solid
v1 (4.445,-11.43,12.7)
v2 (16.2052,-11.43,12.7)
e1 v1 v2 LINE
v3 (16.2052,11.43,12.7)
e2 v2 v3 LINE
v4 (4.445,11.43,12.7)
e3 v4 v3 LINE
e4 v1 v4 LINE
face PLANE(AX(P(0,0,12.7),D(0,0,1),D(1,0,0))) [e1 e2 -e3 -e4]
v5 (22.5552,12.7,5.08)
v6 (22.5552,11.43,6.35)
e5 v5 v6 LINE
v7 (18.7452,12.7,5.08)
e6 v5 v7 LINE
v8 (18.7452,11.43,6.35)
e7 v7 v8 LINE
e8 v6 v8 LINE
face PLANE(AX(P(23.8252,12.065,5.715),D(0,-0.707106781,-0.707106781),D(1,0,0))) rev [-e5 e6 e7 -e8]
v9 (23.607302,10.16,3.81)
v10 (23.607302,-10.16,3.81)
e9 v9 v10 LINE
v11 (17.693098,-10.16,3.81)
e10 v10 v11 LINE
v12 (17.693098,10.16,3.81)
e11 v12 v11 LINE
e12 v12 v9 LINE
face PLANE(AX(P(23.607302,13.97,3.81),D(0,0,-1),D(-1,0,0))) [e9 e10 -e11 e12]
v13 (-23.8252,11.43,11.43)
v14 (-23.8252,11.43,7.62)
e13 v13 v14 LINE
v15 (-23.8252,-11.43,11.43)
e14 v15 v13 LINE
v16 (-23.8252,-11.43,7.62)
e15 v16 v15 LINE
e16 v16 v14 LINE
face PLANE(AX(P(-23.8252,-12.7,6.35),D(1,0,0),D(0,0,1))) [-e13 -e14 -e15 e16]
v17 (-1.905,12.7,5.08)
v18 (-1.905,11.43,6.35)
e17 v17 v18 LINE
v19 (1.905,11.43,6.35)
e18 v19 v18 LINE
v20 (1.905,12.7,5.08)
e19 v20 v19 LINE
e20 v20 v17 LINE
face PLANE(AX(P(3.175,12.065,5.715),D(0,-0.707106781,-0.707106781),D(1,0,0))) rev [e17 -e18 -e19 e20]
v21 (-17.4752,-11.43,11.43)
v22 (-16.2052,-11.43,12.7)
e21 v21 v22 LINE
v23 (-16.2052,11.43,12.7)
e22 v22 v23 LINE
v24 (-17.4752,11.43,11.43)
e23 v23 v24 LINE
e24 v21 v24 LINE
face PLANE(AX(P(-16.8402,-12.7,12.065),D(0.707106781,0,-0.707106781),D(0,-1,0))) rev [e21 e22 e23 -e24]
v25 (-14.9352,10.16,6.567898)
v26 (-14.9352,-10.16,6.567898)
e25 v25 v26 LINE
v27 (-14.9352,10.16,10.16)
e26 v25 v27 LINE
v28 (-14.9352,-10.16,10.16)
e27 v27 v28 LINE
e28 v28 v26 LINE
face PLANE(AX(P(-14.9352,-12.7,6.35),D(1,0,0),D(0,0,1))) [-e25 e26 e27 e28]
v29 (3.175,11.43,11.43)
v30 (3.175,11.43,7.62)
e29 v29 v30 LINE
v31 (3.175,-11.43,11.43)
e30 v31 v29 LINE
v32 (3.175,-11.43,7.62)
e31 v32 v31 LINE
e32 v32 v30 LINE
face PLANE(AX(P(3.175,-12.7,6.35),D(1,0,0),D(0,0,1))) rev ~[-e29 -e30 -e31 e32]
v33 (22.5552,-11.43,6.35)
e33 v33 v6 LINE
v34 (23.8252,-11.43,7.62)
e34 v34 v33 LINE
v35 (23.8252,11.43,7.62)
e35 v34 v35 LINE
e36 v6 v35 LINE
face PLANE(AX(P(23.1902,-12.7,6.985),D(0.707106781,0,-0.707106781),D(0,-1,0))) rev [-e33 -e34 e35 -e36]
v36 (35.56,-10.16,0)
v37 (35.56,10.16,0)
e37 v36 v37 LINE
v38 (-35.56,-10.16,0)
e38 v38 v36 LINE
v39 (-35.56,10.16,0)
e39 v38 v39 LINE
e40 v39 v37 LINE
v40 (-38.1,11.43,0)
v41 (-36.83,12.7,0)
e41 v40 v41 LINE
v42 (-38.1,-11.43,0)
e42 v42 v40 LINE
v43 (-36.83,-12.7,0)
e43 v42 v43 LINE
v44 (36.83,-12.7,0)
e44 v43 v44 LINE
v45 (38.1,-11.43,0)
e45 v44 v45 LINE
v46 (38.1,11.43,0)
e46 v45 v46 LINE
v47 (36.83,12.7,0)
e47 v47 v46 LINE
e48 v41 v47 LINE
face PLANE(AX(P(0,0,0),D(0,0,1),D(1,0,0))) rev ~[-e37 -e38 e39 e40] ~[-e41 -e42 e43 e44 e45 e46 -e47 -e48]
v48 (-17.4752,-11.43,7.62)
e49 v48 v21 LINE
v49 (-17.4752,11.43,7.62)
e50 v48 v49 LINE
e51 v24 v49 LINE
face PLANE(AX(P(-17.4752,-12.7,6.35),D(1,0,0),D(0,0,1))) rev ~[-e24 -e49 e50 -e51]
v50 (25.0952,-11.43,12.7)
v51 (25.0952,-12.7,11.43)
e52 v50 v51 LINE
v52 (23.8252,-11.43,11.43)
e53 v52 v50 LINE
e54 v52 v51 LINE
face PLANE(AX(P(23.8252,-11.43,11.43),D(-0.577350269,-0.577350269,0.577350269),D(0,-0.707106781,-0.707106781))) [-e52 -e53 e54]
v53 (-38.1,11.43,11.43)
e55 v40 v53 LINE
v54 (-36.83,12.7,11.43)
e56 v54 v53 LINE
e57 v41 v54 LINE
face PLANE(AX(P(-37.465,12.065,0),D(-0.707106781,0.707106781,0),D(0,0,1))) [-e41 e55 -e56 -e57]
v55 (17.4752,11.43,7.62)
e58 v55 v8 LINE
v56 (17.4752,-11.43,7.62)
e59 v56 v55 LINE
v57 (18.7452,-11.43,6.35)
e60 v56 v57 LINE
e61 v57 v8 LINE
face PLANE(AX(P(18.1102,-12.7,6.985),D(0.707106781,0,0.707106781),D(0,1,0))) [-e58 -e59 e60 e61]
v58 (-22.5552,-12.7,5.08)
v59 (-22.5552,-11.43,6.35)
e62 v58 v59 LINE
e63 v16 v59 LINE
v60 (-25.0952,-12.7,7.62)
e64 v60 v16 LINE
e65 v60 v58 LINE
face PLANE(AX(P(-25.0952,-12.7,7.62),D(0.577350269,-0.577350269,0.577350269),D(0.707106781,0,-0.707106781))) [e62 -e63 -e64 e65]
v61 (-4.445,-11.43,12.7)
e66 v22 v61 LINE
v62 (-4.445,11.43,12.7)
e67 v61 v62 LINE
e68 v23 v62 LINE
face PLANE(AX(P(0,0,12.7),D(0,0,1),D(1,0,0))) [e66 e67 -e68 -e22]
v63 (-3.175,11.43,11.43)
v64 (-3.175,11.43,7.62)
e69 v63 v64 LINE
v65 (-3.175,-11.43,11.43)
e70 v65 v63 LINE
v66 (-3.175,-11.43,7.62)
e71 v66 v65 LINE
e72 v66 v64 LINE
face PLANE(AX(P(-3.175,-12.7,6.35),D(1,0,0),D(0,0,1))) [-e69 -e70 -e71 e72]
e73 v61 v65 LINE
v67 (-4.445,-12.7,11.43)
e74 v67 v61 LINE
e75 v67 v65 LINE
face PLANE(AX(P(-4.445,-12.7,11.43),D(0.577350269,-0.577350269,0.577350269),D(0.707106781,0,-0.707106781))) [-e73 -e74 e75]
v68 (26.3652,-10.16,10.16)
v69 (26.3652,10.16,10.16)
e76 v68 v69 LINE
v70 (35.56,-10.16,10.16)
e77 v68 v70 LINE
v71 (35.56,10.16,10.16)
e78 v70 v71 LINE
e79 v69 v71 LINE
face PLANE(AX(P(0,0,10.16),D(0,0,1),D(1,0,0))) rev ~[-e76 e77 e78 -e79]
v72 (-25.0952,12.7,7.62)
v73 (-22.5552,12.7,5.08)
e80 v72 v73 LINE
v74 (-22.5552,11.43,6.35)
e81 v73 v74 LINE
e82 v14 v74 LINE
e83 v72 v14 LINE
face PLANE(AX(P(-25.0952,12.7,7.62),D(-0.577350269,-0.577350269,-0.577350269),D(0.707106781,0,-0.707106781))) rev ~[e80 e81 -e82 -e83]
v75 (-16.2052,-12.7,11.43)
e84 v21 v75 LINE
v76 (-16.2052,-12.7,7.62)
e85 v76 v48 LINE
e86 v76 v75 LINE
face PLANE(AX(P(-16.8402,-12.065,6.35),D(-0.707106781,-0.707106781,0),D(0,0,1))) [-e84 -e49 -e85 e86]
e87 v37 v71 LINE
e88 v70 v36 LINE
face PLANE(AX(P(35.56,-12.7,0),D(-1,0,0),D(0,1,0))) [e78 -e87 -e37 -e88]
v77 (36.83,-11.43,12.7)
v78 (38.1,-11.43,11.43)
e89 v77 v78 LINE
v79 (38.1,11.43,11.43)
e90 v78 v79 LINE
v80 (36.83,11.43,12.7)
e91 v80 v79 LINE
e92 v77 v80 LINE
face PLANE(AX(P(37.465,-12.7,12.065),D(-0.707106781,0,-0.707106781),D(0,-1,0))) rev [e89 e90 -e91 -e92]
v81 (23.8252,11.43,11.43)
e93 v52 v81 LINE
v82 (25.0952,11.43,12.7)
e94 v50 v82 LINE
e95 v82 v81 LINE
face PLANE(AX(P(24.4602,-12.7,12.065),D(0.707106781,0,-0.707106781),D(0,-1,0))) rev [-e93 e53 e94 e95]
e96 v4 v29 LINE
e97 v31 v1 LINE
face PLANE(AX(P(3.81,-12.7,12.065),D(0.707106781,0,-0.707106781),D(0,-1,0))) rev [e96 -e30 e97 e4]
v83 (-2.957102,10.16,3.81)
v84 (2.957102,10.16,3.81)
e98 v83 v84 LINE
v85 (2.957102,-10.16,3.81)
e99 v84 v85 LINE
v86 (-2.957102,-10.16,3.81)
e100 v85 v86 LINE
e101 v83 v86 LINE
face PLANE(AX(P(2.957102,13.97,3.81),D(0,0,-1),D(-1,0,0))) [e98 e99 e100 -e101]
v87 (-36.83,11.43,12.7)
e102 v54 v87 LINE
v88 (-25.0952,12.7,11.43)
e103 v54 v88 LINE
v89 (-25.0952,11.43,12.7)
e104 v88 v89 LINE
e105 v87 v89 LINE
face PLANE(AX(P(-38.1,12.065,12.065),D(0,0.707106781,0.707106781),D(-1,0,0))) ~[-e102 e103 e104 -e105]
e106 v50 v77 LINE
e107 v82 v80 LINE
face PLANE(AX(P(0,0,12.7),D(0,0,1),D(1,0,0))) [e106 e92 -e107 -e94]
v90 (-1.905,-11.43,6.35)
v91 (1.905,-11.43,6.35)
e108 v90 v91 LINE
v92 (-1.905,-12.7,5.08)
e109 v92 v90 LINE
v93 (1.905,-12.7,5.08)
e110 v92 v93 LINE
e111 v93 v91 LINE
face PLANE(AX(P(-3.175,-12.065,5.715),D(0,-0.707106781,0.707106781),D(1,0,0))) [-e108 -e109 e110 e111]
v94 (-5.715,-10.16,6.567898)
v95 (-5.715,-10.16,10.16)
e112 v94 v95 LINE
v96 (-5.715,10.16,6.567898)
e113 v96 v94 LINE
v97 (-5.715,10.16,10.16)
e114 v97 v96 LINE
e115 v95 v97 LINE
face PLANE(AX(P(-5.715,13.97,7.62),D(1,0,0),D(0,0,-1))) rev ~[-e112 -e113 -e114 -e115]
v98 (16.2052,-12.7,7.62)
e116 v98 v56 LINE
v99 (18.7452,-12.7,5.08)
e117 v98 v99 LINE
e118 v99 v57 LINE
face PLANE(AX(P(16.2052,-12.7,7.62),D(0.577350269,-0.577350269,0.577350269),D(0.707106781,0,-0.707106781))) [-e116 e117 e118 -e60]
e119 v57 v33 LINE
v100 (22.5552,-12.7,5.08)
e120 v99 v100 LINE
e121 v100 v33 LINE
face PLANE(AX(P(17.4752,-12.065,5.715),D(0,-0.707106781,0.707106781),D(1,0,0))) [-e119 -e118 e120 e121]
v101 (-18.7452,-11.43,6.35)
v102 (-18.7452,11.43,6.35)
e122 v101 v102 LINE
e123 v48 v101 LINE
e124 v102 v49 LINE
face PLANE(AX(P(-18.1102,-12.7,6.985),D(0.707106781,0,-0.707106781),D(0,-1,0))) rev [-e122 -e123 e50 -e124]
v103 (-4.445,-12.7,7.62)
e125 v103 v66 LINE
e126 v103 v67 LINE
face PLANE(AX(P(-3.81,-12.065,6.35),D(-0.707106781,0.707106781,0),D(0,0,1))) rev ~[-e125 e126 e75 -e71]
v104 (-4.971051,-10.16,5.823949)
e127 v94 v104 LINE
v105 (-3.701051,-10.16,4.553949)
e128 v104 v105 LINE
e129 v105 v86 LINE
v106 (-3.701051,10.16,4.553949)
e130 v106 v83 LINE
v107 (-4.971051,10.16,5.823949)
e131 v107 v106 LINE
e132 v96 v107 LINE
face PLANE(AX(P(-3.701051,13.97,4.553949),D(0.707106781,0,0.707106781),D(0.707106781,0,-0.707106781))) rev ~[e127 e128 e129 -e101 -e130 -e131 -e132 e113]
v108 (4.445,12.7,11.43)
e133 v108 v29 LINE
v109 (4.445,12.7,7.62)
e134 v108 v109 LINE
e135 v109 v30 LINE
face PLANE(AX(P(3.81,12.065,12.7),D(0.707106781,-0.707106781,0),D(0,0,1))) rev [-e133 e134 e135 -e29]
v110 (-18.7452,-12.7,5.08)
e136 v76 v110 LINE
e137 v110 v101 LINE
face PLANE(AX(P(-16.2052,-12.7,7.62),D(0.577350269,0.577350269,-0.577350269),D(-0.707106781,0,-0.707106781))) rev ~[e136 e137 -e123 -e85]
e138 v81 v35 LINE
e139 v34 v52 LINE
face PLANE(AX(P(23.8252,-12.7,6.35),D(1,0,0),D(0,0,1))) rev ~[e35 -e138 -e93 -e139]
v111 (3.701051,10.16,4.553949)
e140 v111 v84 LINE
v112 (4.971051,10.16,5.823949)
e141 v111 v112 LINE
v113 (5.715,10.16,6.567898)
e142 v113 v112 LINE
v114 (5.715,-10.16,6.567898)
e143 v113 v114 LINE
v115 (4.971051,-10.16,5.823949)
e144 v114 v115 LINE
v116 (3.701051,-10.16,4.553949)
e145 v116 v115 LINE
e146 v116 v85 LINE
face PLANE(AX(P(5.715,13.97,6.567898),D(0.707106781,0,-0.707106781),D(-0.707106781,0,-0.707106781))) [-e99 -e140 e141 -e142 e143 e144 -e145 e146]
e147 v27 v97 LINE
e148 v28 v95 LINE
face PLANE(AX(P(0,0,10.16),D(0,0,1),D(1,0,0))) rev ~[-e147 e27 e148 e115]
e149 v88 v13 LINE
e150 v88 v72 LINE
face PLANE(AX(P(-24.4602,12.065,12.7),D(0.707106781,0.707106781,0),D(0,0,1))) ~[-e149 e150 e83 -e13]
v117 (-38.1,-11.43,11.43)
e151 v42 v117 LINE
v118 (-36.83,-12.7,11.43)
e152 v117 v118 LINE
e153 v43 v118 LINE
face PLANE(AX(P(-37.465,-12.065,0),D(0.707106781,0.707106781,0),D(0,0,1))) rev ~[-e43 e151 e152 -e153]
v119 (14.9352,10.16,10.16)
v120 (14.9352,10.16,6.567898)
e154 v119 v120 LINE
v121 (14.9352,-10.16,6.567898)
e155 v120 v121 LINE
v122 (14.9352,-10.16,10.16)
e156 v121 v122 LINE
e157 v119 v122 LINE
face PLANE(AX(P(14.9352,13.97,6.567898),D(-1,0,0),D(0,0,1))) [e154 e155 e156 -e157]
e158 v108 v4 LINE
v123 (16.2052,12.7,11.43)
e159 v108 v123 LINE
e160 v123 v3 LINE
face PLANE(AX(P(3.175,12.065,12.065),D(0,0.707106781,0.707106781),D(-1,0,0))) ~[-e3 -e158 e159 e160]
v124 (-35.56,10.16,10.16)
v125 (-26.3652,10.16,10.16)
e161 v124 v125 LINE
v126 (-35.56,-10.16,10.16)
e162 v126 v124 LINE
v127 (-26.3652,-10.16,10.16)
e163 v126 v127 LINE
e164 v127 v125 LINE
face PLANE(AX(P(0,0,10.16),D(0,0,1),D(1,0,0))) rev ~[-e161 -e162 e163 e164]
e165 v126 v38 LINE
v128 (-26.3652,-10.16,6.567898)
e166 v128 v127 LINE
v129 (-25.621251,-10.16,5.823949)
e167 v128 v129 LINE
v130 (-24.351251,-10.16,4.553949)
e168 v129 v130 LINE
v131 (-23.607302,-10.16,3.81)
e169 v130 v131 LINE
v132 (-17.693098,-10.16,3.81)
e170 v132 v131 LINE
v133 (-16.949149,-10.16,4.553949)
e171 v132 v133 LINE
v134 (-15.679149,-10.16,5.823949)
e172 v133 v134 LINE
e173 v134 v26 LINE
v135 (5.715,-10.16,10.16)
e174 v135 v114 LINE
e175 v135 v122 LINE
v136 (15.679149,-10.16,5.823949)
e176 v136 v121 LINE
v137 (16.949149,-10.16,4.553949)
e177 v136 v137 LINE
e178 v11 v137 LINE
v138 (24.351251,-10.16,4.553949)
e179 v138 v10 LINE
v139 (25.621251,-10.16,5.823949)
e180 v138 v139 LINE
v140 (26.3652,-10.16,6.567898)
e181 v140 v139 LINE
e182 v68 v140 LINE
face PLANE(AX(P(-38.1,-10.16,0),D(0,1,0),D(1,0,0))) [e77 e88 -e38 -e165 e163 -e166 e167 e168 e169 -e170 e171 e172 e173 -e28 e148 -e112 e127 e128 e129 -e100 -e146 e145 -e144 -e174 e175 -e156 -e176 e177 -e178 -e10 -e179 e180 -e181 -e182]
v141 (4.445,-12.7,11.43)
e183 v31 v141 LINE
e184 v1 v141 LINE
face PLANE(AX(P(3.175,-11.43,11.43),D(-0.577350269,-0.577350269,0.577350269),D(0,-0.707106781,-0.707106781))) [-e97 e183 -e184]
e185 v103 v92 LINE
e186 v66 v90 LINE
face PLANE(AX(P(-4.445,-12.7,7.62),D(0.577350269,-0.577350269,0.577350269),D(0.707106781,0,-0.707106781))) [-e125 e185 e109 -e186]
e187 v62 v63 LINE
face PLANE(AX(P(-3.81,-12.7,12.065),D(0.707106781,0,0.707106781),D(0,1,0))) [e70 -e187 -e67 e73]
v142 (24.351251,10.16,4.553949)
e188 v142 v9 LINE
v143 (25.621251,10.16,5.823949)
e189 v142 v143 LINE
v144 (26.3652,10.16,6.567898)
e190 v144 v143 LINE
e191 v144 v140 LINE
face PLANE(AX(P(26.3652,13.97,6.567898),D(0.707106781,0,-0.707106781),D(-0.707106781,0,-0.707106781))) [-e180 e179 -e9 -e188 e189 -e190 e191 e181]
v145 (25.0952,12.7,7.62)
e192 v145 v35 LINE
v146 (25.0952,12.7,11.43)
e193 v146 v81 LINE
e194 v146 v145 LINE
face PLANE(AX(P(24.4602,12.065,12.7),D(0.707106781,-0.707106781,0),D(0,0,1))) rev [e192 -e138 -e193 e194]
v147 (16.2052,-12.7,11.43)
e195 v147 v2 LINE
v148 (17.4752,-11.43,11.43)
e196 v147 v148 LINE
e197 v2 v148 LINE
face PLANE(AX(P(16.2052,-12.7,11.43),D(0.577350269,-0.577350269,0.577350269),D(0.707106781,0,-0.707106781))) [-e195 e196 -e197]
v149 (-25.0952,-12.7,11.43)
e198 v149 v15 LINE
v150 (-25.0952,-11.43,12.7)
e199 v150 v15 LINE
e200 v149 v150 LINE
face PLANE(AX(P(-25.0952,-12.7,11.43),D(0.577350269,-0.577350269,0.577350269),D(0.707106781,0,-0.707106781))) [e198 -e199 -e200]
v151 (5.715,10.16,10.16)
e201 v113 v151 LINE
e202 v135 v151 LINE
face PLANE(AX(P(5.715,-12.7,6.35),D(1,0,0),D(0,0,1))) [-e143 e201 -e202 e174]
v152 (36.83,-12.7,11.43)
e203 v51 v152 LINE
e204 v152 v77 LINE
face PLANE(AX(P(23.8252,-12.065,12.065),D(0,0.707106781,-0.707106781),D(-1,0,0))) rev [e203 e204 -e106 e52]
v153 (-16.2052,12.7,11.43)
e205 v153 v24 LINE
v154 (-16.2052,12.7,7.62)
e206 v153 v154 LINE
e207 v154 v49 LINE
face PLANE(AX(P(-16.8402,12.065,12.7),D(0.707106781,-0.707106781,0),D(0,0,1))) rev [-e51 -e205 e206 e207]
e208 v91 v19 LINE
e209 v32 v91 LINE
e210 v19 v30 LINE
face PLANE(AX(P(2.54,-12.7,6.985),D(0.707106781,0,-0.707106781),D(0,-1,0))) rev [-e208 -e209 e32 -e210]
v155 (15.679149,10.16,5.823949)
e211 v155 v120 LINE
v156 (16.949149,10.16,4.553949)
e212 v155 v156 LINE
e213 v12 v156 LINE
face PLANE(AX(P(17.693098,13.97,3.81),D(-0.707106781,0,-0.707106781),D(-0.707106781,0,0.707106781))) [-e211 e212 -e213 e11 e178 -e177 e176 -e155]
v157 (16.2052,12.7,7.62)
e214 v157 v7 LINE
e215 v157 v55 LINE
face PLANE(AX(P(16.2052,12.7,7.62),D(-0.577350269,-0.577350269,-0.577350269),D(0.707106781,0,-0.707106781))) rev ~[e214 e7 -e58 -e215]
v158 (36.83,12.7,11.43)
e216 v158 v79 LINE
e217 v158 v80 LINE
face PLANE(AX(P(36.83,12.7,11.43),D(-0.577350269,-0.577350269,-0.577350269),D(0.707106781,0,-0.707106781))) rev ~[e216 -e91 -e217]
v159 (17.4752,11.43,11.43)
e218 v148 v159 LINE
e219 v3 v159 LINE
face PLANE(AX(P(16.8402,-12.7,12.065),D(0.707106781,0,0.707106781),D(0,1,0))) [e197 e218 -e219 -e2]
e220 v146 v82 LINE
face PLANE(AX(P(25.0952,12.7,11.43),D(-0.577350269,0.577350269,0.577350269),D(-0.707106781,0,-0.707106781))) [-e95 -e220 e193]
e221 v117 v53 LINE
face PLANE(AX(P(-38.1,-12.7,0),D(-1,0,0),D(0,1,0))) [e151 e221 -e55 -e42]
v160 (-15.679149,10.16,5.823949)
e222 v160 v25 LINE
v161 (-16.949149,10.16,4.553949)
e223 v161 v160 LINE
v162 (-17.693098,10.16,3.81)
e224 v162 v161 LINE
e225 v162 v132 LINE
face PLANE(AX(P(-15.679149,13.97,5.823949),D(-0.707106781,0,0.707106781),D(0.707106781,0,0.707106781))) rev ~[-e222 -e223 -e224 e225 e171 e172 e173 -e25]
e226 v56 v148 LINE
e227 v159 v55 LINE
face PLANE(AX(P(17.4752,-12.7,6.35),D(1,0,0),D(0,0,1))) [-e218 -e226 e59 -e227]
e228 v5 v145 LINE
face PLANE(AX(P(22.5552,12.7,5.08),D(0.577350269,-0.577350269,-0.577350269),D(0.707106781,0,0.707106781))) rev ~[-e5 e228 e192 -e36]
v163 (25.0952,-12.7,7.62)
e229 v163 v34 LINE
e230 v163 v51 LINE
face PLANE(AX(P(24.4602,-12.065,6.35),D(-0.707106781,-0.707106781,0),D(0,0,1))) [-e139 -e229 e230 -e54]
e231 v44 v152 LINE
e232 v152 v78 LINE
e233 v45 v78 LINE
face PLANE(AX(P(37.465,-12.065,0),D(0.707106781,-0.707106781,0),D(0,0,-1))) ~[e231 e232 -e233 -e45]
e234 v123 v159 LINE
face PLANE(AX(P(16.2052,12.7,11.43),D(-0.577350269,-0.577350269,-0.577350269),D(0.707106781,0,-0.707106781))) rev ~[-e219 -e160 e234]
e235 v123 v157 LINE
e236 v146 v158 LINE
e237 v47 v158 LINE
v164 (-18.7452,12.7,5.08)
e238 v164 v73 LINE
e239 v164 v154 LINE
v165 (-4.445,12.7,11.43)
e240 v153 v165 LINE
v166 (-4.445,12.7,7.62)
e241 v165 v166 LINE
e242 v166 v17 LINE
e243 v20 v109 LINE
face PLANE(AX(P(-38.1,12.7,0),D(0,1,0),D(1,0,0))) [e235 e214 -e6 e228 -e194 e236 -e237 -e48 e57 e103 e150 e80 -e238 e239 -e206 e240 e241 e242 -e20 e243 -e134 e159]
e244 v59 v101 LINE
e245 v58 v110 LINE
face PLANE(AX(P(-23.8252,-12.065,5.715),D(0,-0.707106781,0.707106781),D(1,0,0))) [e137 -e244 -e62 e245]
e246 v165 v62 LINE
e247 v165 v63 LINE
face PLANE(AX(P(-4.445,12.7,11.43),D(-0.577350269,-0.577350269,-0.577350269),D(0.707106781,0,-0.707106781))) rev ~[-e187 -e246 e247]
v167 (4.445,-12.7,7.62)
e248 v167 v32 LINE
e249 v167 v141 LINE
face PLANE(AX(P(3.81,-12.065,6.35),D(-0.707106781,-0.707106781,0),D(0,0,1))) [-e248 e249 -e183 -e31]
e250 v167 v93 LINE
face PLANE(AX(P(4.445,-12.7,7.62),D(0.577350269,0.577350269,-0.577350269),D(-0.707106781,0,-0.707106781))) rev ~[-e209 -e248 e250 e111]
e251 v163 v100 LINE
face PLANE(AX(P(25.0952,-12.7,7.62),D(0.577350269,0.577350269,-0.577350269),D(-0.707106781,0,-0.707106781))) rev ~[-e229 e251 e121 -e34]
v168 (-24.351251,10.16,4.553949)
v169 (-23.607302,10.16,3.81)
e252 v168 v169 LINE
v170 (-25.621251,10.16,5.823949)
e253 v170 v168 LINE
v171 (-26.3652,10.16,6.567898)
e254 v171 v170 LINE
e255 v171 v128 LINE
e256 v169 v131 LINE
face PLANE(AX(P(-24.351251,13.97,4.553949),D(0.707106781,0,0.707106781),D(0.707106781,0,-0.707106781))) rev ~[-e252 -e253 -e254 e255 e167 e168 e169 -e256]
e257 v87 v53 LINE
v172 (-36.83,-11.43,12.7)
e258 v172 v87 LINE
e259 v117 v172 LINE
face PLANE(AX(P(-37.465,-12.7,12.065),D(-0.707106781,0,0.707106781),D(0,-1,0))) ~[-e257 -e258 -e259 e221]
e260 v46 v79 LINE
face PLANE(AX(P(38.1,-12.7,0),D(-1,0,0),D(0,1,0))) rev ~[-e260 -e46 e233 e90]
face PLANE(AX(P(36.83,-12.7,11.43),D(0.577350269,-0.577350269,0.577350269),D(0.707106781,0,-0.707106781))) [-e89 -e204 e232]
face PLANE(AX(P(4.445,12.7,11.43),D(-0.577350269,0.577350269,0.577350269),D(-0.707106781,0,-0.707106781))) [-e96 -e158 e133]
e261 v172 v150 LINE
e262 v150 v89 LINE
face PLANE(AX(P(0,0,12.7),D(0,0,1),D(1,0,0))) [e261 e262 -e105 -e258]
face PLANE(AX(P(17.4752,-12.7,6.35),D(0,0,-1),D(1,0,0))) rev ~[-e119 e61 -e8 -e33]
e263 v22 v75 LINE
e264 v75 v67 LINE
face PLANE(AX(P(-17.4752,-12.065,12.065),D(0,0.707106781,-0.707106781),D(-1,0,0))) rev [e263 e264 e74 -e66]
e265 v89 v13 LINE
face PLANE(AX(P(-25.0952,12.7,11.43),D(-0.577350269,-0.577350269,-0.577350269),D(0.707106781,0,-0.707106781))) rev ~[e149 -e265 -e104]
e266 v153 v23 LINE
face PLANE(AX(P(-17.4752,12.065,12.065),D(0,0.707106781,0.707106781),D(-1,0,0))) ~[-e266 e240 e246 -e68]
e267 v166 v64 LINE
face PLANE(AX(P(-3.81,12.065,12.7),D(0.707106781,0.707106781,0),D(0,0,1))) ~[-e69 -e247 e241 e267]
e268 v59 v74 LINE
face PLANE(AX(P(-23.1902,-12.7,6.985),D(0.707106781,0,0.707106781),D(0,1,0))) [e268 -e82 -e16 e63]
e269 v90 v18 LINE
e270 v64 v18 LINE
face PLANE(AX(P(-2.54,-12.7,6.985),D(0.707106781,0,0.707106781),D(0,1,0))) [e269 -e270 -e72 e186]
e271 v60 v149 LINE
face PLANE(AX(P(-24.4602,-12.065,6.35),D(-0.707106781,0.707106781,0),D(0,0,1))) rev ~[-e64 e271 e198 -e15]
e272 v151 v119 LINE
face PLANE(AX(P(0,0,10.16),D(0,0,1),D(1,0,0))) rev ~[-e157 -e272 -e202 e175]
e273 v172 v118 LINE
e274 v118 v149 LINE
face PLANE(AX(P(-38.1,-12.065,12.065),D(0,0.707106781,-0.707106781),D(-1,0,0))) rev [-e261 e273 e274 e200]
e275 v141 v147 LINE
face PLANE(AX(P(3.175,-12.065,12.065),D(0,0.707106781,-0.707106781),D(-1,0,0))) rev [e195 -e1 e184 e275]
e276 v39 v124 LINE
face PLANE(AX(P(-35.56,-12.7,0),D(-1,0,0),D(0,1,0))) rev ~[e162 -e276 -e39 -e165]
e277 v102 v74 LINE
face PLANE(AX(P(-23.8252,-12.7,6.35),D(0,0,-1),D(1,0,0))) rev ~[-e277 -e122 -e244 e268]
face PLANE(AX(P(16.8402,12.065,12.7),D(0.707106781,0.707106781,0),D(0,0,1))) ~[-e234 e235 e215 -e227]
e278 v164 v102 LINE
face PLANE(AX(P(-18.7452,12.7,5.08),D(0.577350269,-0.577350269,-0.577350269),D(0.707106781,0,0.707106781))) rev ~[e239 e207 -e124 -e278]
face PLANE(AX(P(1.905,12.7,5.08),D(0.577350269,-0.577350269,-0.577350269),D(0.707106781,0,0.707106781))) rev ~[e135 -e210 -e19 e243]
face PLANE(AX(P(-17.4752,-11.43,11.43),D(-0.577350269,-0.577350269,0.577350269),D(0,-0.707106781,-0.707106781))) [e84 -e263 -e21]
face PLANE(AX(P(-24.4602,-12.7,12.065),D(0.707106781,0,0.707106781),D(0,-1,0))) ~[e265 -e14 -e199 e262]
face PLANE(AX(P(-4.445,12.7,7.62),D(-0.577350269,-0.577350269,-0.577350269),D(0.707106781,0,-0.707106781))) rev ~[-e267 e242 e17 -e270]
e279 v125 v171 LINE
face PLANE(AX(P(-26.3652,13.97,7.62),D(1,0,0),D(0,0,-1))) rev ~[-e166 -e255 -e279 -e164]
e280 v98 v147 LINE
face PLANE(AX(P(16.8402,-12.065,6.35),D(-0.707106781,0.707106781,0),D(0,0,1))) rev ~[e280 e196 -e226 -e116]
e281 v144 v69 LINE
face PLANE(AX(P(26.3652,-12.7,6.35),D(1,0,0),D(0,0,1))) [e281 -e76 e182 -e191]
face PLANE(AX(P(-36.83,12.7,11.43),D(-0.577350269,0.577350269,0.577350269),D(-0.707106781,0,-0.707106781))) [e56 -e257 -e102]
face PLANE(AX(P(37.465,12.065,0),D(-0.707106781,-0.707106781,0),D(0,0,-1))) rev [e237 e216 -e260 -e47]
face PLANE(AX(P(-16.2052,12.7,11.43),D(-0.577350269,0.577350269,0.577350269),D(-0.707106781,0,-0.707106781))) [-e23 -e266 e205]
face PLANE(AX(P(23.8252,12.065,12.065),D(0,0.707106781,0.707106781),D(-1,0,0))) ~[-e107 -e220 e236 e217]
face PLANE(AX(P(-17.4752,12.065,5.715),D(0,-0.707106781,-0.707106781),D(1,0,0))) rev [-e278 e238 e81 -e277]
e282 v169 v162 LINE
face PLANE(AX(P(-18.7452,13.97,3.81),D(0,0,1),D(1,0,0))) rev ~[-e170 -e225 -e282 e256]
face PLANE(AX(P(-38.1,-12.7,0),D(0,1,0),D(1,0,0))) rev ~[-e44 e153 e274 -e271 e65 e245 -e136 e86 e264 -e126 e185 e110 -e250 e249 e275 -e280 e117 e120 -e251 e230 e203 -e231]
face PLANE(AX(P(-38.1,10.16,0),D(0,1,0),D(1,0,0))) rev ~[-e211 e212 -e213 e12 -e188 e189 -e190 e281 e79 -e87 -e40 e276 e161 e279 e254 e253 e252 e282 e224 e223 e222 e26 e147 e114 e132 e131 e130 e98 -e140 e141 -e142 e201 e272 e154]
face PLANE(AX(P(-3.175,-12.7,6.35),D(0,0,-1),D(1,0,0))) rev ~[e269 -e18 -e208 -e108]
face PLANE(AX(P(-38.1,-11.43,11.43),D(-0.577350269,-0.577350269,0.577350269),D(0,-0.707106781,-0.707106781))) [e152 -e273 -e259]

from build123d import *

# Parameters (mm, degrees)
F0_W         = 76.2
F0_H         = 25.4
F1_DEPTH     = 12.7
F2_W         = 6.35
F2_H         = 12.7
F3_DEPTH     = 25.401
F4_SIZE      = 1.27
F5_T         = 2.54
F5_T3_DEPTH  = 6.8760512242
F5_T5_DEPTH  = 6.8760512242
F5_T7_DEPTH  = 6.8760512242
F5_T9_DEPTH  = 6.8760512242
F5_T11_DEPTH = 6.8760512242
F5_T13_DEPTH = 6.8760512242
F5_T15_DEPTH = 6.8760512242
F5_T17_DEPTH = 27.94
F5_T19_DEPTH = 6.8760512242
F5_T21_DEPTH = 6.8760512242
F5_T23_DEPTH = 6.8760512242
F5_T25_DEPTH = 6.8760512242
F5_T27_DEPTH = 6.8760512242
F5_T29_DEPTH = 6.8760512242
F5_T31_DEPTH = 6.8760512242


# Not quite as in the source:
# - a shell that OpenCascade refuses in one call is made with other operations: the cavity is built on its own and cut out


with BuildPart() as f1:
    # F0 (on Top) → F1 (new body)
    with BuildSketch(Plane.XY):
        Rectangle(F0_W, F0_H)
    extrude(amount=F1_DEPTH)

    # F2 (on face) → F3 (cut, through all)
    with BuildSketch(Plane.XZ.offset(12.7)):
        with Locations((0, 12.7)):
            Rectangle(F2_W, F2_H)
        with Locations((20.6502, 12.7)):
            Rectangle(F2_W, F2_H)
        with Locations((-20.6502, 12.7)):
            Rectangle(F2_W, F2_H)
    extrude(amount=-F3_DEPTH, mode=Mode.SUBTRACT)

    # F4
    f4_edges = [f1.edges().sort_by_distance(p)[0] for p in [
        (-23.8252, 0, 12.7),
        (-30.9626, -12.7, 12.7),
        (-38.1, 0, 12.7),
        (-30.9626, 12.7, 12.7),
        (-3.175, 0, 12.7),
        (-10.3251, -12.7, 12.7),
        (-17.4752, 0, 12.7),
        (-10.3251, 12.7, 12.7),
        (17.4752, 0, 12.7),
        (10.3251, -12.7, 12.7),
        (3.175, 0, 12.7),
        (10.3251, 12.7, 12.7),
        (38.1, 0, 12.7),
        (30.9626, -12.7, 12.7),
        (23.8252, 0, 12.7),
        (30.9626, 12.7, 12.7),
        (-20.6502, -12.7, 6.35),
        (-17.4752, 0, 6.35),
        (-20.6502, 12.7, 6.35),
        (-23.8252, 0, 6.35),
        (0, -12.7, 6.35),
        (3.175, 0, 6.35),
        (0, 12.7, 6.35),
        (-3.175, 0, 6.35),
        (20.6502, -12.7, 6.35),
        (23.8252, 0, 6.35),
        (20.6502, 12.7, 6.35),
        (17.4752, 0, 6.35),
        (-38.1, -12.7, 6.35),
        (38.1, -12.7, 6.35),
        (38.1, 12.7, 6.35),
        (-38.1, 12.7, 6.35),
        (-23.8252, 12.7, 9.525),
        (-17.4752, 12.7, 9.525),
        (-3.175, 12.7, 9.525),
        (3.175, 12.7, 9.525),
        (17.4752, 12.7, 9.525),
        (23.8252, 12.7, 9.525),
        (-23.8252, -12.7, 9.525),
        (-17.4752, -12.7, 9.525),
        (-3.175, -12.7, 9.525),
        (3.175, -12.7, 9.525),
        (17.4752, -12.7, 9.525),
        (23.8252, -12.7, 9.525),
    ]]
    chamfer(f4_edges, length=F4_SIZE)

    # F5: shell of thickness 2.54, made by hand


with BuildPart() as f5_core1:
    # F5_t2: copy of F1
    add(f1.part)

    # the walls: a layer under each face that stays
    f5_faces = [f5_core1.faces().sort_by_distance(p)[0] for p in [
        (24.5533333333, 12.7, 5.715),
        (37.465, 12.065, 5.715),
        (-37.465, 12.065, 5.715),
        (30.9626, 12.065, 12.065),
        (-30.9626, 12.065, 12.065),
        (24.4602, 12.065, 9.525),
        (-24.4602, 12.065, 9.525),
        (23.5077, 12.065, 6.6675),
        (-23.5077, 12.065, 6.6675),
        (20.6502, 12.065, 5.715),
        (-20.6502, 12.065, 5.715),
        (17.7927, 12.065, 6.6675),
        (-17.7927, 12.065, 6.6675),
        (16.8402, 12.065, 9.525),
        (-16.8402, 12.065, 9.525),
        (10.3251, 12.065, 12.065),
        (-10.3251, 12.065, 12.065),
        (3.81, 12.065, 9.525),
        (-3.81, 12.065, 9.525),
        (2.8575, 12.065, 6.6675),
        (-2.8575, 12.065, 6.6675),
        (0, 12.065, 5.715),
        (38.1, 0, 5.715),
        (-38.1, 0, 5.715),
        (37.465, -12.065, 5.715),
        (-37.465, -12.065, 5.715),
        (-24.5533333333, -12.7, 5.715),
        (37.1475, 12.065, 11.7475),
        (-37.1475, 12.065, 11.7475),
        (30.9626, 0, 12.7),
        (24.7777, 12.065, 11.7475),
        (-24.7777, 12.065, 11.7475),
        (-30.9626, 0, 12.7),
        (23.8252, 0, 9.525),
        (-23.8252, 0, 9.525),
        (23.1902, 0, 6.985),
        (-23.1902, 0, 6.985),
        (20.6502, 0, 6.35),
        (-20.6502, 0, 6.35),
        (18.1102, 0, 6.985),
        (-18.1102, 0, 6.985),
        (16.5227, 12.065, 11.7475),
        (17.4752, 0, 9.525),
        (-17.4752, 0, 9.525),
        (-16.5227, 12.065, 11.7475),
        (10.3251, 0, 12.7),
        (4.1275, 12.065, 11.7475),
        (-4.1275, 12.065, 11.7475),
        (-10.3251, 0, 12.7),
        (3.175, 0, 9.525),
        (-3.175, 0, 9.525),
        (2.54, 0, 6.985),
        (-2.54, 0, 6.985),
        (0, 0, 6.35),
        (37.465, 0, 12.065),
        (-37.465, 0, 12.065),
        (37.1475, -12.065, 11.7475),
        (-37.465, -11.7475, 11.7475),
        (-30.9626, -12.065, 12.065),
        (30.9626, -12.065, 12.065),
        (-24.4602, -12.065, 9.525),
        (24.4602, -12.065, 9.525),
        (-23.5077, -12.065, 6.6675),
        (23.5077, -12.065, 6.6675),
        (-20.6502, -12.065, 5.715),
        (20.6502, -12.065, 5.715),
        (-17.7927, -12.065, 6.6675),
        (17.7927, -12.065, 6.6675),
        (-16.8402, -12.065, 9.525),
        (16.8402, -12.065, 9.525),
        (-10.3251, -12.065, 12.065),
        (10.3251, -12.065, 12.065),
        (-3.81, -12.065, 9.525),
        (3.81, -12.065, 9.525),
        (-2.8575, -12.065, 6.6675),
        (2.8575, -12.065, 6.6675),
        (0, -12.065, 5.715),
        (24.4602, 0, 12.065),
        (-24.4602, 0, 12.065),
        (16.8402, 0, 12.065),
        (-16.8402, 0, 12.065),
        (3.81, 0, 12.065),
        (-3.81, 0, 12.065),
        (-24.7777, -12.065, 11.7475),
        (24.4602, -11.7475, 11.7475),
        (-16.8402, -11.7475, 11.7475),
        (16.5227, -12.065, 11.7475),
        (-4.1275, -12.065, 11.7475),
        (3.81, -11.7475, 11.7475),
    ]]
    thicken(f5_faces, amount=-F5_T, mode=Mode.SUBTRACT)

    # F5_s4 → F5_t3 (cut)
    with BuildSketch(Plane(origin=(20.6936512242, 20.6936512242, 0), x_dir=(0, 0, 1), z_dir=(-0.7071067812, -0.7071067812, 0))):
        Polygon((7.6346646968, -8.718590961), (7.62, -11.3047299742), (6.8126933972, -11.3047299742), (6.1535303163, -10.8386312897), align=None)
    extrude(amount=F5_T3_DEPTH, mode=Mode.SUBTRACT)

    # F5_s6 → F5_t5 (cut)
    with BuildSketch(Plane(origin=(-20.6936512242, 20.6936512242, 0), x_dir=(0, 0, 1), z_dir=(0.7071067812, -0.7071067812, 0))):
        Polygon((7.6346646968, 8.718590961), (7.62, 11.3047299742), (6.8126933972, 11.3047299742), (6.1535303163, 10.8386312897), align=None)
    extrude(amount=F5_T5_DEPTH, mode=Mode.SUBTRACT)

    # F5_s8 → F5_t7 (cut)
    with BuildSketch(Plane(origin=(0, 5.6060512242, -5.6060512242), x_dir=(1, 0, 0), z_dir=(0, -0.7071067812, 0.7071067812))):
        Polygon((22.5405353032, 12.6184975827), (24.0216696837, 10.4984572539), (23.3625066028, 10.0323585695), (22.5552, 10.0323585695), align=None)
        Polygon((-22.5405353032, 12.6184975827), (-24.0216696837, 10.4984572539), (-23.3625066028, 10.0323585695), (-22.5552, 10.0323585695), align=None)
        Polygon((18.7598646968, 12.6184975827), (18.7452, 10.0323585695), (17.9378933972, 10.0323585695), (17.2787303163, 10.4984572539), align=None)
        Polygon((-18.7598646968, 12.6184975827), (-18.7452, 10.0323585695), (-17.9378933972, 10.0323585695), (-17.2787303163, 10.4984572539), align=None)
        Polygon((1.8903353032, 12.6184975827), (3.3714696837, 10.4984572539), (2.7123066028, 10.0323585695), (1.905, 10.0323585695), align=None)
        Polygon((-1.8903353032, 12.6184975827), (-3.3714696837, 10.4984572539), (-2.7123066028, 10.0323585695), (-1.905, 10.0323585695), align=None)
    extrude(amount=F5_T7_DEPTH, mode=Mode.SUBTRACT)

    # F5_s10 → F5_t9 (cut)
    with BuildSketch(Plane(origin=(-0.0434512242, 0.0434512242, 0), x_dir=(0, 0, 1), z_dir=(0.7071067812, -0.7071067812, 0))):
        Polygon((7.6346646968, -20.4852019447), (6.1535303163, -18.365161616), (6.8126933972, -17.8990629316), (7.62, -17.8990629316), align=None)
    extrude(amount=F5_T9_DEPTH, mode=Mode.SUBTRACT)

    # F5_s12 → F5_t11 (cut)
    with BuildSketch(Plane(origin=(0.0434512242, 0.0434512242, 0), x_dir=(0, 0, 1), z_dir=(-0.7071067812, -0.7071067812, 0))):
        Polygon((7.6346646968, 20.4852019447), (6.1535303163, 18.365161616), (6.8126933972, 17.8990629316), (7.62, 17.8990629316), align=None)
    extrude(amount=F5_T11_DEPTH, mode=Mode.SUBTRACT)

    # F5_s14 → F5_t13 (cut)
    with BuildSketch(Plane(origin=(10.3685512242, 10.3685512242, 0), x_dir=(0, 0, 1), z_dir=(-0.7071067812, -0.7071067812, 0))):
        Polygon((7.6346646968, 5.8833054919), (7.62, 3.2971664787), (6.8126933972, 3.2971664787), (6.1535303163, 3.7632651631), align=None)
    extrude(amount=F5_T13_DEPTH, mode=Mode.SUBTRACT)

    # F5_s16 → F5_t15 (cut)
    with BuildSketch(Plane(origin=(-10.3685512242, 10.3685512242, 0), x_dir=(0, 0, 1), z_dir=(0.7071067812, -0.7071067812, 0))):
        Polygon((7.6346646968, -5.8833054919), (7.62, -3.2971664787), (6.8126933972, -3.2971664787), (6.1535303163, -3.7632651631), align=None)
    extrude(amount=F5_T15_DEPTH, mode=Mode.SUBTRACT)

    # F5_s18 → F5_t17 (cut)
    with BuildSketch(Plane.XZ.offset(-13.97)):
        Polygon((23.7818394878, 7.6379605122), (26.3652, 7.62), (26.3652, 6.5678975516), (25.6212512242, 5.8239487758), align=None)
        Polygon((-23.7818394878, 7.6379605122), (-26.3652, 7.62), (-26.3652, 6.5678975516), (-25.6212512242, 5.8239487758), align=None)
        Polygon((22.5372394878, 6.3933605122), (24.3512512242, 4.5539487758), (23.6073024484, 3.81), (22.5552, 3.81), align=None)
        Polygon((-22.5372394878, 6.3933605122), (-24.3512512242, 4.5539487758), (-23.6073024484, 3.81), (-22.5552, 3.81), align=None)
        Polygon((18.7631605122, 6.3933605122), (18.7452, 3.81), (17.6930975516, 3.81), (16.9491487758, 4.5539487758), align=None)
        Polygon((-18.7631605122, 6.3933605122), (-18.7452, 3.81), (-17.6930975516, 3.81), (-16.9491487758, 4.5539487758), align=None)
        Polygon((17.5185605122, 7.6379605122), (15.6791487758, 5.8239487758), (14.9352, 6.5678975516), (14.9352, 7.62), align=None)
        Polygon((-17.5185605122, 7.6379605122), (-15.6791487758, 5.8239487758), (-14.9352, 6.5678975516), (-14.9352, 7.62), align=None)
        Polygon((3.1316394878, 7.6379605122), (5.715, 7.62), (5.715, 6.5678975516), (4.9710512242, 5.8239487758), align=None)
        Polygon((-3.1316394878, 7.6379605122), (-5.715, 7.62), (-5.715, 6.5678975516), (-4.9710512242, 5.8239487758), align=None)
        Polygon((1.8870394878, 6.3933605122), (3.7010512242, 4.5539487758), (2.9571024484, 3.81), (1.905, 3.81), align=None)
        Polygon((-1.8870394878, 6.3933605122), (-3.7010512242, 4.5539487758), (-2.9571024484, 3.81), (-1.905, 3.81), align=None)
    extrude(amount=F5_T17_DEPTH, mode=Mode.SUBTRACT)

    # F5_s20 → F5_t19 (cut)
    with BuildSketch(Plane(origin=(-20.6936512242, -20.6936512242, 0), x_dir=(0, 0, 1), z_dir=(0.7071067812, 0.7071067812, 0))):
        Polygon((7.6346646968, -8.718590961), (7.62, -11.3047299742), (6.8126933972, -11.3047299742), (6.1535303163, -10.8386312897), align=None)
    extrude(amount=F5_T19_DEPTH, mode=Mode.SUBTRACT)

    # F5_s22 → F5_t21 (cut)
    with BuildSketch(Plane(origin=(20.6936512242, -20.6936512242, 0), x_dir=(0, 0, 1), z_dir=(-0.7071067812, 0.7071067812, 0))):
        Polygon((7.6346646968, 8.718590961), (7.62, 11.3047299742), (6.8126933972, 11.3047299742), (6.1535303163, 10.8386312897), align=None)
    extrude(amount=F5_T21_DEPTH, mode=Mode.SUBTRACT)

    # F5_s24 → F5_t23 (cut)
    with BuildSketch(Plane(origin=(0, -5.6060512242, -5.6060512242), x_dir=(1, 0, 0), z_dir=(0, 0.7071067812, 0.7071067812))):
        Polygon((-22.5405353032, -12.6184975827), (-24.0216696837, -10.4984572539), (-23.3625066028, -10.0323585695), (-22.5552, -10.0323585695), align=None)
        Polygon((22.5405353032, -12.6184975827), (24.0216696837, -10.4984572539), (23.3625066028, -10.0323585695), (22.5552, -10.0323585695), align=None)
        Polygon((-18.7598646968, -12.6184975827), (-18.7452, -10.0323585695), (-17.9378933972, -10.0323585695), (-17.2787303163, -10.4984572539), align=None)
        Polygon((18.7598646968, -12.6184975827), (18.7452, -10.0323585695), (17.9378933972, -10.0323585695), (17.2787303163, -10.4984572539), align=None)
        Polygon((-1.8903353032, -12.6184975827), (-3.3714696837, -10.4984572539), (-2.7123066028, -10.0323585695), (-1.905, -10.0323585695), align=None)
        Polygon((1.8903353032, -12.6184975827), (3.3714696837, -10.4984572539), (2.7123066028, -10.0323585695), (1.905, -10.0323585695), align=None)
    extrude(amount=F5_T23_DEPTH, mode=Mode.SUBTRACT)

    # F5_s26 → F5_t25 (cut)
    with BuildSketch(Plane(origin=(0.0434512242, -0.0434512242, 0), x_dir=(0, 0, 1), z_dir=(-0.7071067812, 0.7071067812, 0))):
        Polygon((7.6346646968, -20.4852019447), (6.1535303163, -18.365161616), (6.8126933972, -17.8990629316), (7.62, -17.8990629316), align=None)
    extrude(amount=F5_T25_DEPTH, mode=Mode.SUBTRACT)

    # F5_s28 → F5_t27 (cut)
    with BuildSketch(Plane(origin=(-0.0434512242, -0.0434512242, 0), x_dir=(0, 0, 1), z_dir=(0.7071067812, 0.7071067812, 0))):
        Polygon((7.6346646968, 20.4852019447), (6.1535303163, 18.365161616), (6.8126933972, 17.8990629316), (7.62, 17.8990629316), align=None)
    extrude(amount=F5_T27_DEPTH, mode=Mode.SUBTRACT)

    # F5_s30 → F5_t29 (cut)
    with BuildSketch(Plane(origin=(-10.3685512242, -10.3685512242, 0), x_dir=(0, 0, 1), z_dir=(0.7071067812, 0.7071067812, 0))):
        Polygon((7.6346646968, 5.8833054919), (7.62, 3.2971664787), (6.8126933972, 3.2971664787), (6.1535303163, 3.7632651631), align=None)
    extrude(amount=F5_T29_DEPTH, mode=Mode.SUBTRACT)

    # F5_s32 → F5_t31 (cut)
    with BuildSketch(Plane(origin=(10.3685512242, -10.3685512242, 0), x_dir=(0, 0, 1), z_dir=(-0.7071067812, 0.7071067812, 0))):
        Polygon((7.6346646968, -5.8833054919), (7.62, -3.2971664787), (6.8126933972, -3.2971664787), (6.1535303163, -3.7632651631), align=None)
    extrude(amount=F5_T31_DEPTH, mode=Mode.SUBTRACT)


with BuildPart() as f1_1:
    add(f1.part)

    # what is left inside the walls is the cavity
    f5_cavity = [f5_core1.part.solids().sort_by_distance(p)[0] for p in [
        (0, -3.386667, 0.0254),
    ]]
    add(f5_cavity, mode=Mode.SUBTRACT)


solid = f1_1.part
